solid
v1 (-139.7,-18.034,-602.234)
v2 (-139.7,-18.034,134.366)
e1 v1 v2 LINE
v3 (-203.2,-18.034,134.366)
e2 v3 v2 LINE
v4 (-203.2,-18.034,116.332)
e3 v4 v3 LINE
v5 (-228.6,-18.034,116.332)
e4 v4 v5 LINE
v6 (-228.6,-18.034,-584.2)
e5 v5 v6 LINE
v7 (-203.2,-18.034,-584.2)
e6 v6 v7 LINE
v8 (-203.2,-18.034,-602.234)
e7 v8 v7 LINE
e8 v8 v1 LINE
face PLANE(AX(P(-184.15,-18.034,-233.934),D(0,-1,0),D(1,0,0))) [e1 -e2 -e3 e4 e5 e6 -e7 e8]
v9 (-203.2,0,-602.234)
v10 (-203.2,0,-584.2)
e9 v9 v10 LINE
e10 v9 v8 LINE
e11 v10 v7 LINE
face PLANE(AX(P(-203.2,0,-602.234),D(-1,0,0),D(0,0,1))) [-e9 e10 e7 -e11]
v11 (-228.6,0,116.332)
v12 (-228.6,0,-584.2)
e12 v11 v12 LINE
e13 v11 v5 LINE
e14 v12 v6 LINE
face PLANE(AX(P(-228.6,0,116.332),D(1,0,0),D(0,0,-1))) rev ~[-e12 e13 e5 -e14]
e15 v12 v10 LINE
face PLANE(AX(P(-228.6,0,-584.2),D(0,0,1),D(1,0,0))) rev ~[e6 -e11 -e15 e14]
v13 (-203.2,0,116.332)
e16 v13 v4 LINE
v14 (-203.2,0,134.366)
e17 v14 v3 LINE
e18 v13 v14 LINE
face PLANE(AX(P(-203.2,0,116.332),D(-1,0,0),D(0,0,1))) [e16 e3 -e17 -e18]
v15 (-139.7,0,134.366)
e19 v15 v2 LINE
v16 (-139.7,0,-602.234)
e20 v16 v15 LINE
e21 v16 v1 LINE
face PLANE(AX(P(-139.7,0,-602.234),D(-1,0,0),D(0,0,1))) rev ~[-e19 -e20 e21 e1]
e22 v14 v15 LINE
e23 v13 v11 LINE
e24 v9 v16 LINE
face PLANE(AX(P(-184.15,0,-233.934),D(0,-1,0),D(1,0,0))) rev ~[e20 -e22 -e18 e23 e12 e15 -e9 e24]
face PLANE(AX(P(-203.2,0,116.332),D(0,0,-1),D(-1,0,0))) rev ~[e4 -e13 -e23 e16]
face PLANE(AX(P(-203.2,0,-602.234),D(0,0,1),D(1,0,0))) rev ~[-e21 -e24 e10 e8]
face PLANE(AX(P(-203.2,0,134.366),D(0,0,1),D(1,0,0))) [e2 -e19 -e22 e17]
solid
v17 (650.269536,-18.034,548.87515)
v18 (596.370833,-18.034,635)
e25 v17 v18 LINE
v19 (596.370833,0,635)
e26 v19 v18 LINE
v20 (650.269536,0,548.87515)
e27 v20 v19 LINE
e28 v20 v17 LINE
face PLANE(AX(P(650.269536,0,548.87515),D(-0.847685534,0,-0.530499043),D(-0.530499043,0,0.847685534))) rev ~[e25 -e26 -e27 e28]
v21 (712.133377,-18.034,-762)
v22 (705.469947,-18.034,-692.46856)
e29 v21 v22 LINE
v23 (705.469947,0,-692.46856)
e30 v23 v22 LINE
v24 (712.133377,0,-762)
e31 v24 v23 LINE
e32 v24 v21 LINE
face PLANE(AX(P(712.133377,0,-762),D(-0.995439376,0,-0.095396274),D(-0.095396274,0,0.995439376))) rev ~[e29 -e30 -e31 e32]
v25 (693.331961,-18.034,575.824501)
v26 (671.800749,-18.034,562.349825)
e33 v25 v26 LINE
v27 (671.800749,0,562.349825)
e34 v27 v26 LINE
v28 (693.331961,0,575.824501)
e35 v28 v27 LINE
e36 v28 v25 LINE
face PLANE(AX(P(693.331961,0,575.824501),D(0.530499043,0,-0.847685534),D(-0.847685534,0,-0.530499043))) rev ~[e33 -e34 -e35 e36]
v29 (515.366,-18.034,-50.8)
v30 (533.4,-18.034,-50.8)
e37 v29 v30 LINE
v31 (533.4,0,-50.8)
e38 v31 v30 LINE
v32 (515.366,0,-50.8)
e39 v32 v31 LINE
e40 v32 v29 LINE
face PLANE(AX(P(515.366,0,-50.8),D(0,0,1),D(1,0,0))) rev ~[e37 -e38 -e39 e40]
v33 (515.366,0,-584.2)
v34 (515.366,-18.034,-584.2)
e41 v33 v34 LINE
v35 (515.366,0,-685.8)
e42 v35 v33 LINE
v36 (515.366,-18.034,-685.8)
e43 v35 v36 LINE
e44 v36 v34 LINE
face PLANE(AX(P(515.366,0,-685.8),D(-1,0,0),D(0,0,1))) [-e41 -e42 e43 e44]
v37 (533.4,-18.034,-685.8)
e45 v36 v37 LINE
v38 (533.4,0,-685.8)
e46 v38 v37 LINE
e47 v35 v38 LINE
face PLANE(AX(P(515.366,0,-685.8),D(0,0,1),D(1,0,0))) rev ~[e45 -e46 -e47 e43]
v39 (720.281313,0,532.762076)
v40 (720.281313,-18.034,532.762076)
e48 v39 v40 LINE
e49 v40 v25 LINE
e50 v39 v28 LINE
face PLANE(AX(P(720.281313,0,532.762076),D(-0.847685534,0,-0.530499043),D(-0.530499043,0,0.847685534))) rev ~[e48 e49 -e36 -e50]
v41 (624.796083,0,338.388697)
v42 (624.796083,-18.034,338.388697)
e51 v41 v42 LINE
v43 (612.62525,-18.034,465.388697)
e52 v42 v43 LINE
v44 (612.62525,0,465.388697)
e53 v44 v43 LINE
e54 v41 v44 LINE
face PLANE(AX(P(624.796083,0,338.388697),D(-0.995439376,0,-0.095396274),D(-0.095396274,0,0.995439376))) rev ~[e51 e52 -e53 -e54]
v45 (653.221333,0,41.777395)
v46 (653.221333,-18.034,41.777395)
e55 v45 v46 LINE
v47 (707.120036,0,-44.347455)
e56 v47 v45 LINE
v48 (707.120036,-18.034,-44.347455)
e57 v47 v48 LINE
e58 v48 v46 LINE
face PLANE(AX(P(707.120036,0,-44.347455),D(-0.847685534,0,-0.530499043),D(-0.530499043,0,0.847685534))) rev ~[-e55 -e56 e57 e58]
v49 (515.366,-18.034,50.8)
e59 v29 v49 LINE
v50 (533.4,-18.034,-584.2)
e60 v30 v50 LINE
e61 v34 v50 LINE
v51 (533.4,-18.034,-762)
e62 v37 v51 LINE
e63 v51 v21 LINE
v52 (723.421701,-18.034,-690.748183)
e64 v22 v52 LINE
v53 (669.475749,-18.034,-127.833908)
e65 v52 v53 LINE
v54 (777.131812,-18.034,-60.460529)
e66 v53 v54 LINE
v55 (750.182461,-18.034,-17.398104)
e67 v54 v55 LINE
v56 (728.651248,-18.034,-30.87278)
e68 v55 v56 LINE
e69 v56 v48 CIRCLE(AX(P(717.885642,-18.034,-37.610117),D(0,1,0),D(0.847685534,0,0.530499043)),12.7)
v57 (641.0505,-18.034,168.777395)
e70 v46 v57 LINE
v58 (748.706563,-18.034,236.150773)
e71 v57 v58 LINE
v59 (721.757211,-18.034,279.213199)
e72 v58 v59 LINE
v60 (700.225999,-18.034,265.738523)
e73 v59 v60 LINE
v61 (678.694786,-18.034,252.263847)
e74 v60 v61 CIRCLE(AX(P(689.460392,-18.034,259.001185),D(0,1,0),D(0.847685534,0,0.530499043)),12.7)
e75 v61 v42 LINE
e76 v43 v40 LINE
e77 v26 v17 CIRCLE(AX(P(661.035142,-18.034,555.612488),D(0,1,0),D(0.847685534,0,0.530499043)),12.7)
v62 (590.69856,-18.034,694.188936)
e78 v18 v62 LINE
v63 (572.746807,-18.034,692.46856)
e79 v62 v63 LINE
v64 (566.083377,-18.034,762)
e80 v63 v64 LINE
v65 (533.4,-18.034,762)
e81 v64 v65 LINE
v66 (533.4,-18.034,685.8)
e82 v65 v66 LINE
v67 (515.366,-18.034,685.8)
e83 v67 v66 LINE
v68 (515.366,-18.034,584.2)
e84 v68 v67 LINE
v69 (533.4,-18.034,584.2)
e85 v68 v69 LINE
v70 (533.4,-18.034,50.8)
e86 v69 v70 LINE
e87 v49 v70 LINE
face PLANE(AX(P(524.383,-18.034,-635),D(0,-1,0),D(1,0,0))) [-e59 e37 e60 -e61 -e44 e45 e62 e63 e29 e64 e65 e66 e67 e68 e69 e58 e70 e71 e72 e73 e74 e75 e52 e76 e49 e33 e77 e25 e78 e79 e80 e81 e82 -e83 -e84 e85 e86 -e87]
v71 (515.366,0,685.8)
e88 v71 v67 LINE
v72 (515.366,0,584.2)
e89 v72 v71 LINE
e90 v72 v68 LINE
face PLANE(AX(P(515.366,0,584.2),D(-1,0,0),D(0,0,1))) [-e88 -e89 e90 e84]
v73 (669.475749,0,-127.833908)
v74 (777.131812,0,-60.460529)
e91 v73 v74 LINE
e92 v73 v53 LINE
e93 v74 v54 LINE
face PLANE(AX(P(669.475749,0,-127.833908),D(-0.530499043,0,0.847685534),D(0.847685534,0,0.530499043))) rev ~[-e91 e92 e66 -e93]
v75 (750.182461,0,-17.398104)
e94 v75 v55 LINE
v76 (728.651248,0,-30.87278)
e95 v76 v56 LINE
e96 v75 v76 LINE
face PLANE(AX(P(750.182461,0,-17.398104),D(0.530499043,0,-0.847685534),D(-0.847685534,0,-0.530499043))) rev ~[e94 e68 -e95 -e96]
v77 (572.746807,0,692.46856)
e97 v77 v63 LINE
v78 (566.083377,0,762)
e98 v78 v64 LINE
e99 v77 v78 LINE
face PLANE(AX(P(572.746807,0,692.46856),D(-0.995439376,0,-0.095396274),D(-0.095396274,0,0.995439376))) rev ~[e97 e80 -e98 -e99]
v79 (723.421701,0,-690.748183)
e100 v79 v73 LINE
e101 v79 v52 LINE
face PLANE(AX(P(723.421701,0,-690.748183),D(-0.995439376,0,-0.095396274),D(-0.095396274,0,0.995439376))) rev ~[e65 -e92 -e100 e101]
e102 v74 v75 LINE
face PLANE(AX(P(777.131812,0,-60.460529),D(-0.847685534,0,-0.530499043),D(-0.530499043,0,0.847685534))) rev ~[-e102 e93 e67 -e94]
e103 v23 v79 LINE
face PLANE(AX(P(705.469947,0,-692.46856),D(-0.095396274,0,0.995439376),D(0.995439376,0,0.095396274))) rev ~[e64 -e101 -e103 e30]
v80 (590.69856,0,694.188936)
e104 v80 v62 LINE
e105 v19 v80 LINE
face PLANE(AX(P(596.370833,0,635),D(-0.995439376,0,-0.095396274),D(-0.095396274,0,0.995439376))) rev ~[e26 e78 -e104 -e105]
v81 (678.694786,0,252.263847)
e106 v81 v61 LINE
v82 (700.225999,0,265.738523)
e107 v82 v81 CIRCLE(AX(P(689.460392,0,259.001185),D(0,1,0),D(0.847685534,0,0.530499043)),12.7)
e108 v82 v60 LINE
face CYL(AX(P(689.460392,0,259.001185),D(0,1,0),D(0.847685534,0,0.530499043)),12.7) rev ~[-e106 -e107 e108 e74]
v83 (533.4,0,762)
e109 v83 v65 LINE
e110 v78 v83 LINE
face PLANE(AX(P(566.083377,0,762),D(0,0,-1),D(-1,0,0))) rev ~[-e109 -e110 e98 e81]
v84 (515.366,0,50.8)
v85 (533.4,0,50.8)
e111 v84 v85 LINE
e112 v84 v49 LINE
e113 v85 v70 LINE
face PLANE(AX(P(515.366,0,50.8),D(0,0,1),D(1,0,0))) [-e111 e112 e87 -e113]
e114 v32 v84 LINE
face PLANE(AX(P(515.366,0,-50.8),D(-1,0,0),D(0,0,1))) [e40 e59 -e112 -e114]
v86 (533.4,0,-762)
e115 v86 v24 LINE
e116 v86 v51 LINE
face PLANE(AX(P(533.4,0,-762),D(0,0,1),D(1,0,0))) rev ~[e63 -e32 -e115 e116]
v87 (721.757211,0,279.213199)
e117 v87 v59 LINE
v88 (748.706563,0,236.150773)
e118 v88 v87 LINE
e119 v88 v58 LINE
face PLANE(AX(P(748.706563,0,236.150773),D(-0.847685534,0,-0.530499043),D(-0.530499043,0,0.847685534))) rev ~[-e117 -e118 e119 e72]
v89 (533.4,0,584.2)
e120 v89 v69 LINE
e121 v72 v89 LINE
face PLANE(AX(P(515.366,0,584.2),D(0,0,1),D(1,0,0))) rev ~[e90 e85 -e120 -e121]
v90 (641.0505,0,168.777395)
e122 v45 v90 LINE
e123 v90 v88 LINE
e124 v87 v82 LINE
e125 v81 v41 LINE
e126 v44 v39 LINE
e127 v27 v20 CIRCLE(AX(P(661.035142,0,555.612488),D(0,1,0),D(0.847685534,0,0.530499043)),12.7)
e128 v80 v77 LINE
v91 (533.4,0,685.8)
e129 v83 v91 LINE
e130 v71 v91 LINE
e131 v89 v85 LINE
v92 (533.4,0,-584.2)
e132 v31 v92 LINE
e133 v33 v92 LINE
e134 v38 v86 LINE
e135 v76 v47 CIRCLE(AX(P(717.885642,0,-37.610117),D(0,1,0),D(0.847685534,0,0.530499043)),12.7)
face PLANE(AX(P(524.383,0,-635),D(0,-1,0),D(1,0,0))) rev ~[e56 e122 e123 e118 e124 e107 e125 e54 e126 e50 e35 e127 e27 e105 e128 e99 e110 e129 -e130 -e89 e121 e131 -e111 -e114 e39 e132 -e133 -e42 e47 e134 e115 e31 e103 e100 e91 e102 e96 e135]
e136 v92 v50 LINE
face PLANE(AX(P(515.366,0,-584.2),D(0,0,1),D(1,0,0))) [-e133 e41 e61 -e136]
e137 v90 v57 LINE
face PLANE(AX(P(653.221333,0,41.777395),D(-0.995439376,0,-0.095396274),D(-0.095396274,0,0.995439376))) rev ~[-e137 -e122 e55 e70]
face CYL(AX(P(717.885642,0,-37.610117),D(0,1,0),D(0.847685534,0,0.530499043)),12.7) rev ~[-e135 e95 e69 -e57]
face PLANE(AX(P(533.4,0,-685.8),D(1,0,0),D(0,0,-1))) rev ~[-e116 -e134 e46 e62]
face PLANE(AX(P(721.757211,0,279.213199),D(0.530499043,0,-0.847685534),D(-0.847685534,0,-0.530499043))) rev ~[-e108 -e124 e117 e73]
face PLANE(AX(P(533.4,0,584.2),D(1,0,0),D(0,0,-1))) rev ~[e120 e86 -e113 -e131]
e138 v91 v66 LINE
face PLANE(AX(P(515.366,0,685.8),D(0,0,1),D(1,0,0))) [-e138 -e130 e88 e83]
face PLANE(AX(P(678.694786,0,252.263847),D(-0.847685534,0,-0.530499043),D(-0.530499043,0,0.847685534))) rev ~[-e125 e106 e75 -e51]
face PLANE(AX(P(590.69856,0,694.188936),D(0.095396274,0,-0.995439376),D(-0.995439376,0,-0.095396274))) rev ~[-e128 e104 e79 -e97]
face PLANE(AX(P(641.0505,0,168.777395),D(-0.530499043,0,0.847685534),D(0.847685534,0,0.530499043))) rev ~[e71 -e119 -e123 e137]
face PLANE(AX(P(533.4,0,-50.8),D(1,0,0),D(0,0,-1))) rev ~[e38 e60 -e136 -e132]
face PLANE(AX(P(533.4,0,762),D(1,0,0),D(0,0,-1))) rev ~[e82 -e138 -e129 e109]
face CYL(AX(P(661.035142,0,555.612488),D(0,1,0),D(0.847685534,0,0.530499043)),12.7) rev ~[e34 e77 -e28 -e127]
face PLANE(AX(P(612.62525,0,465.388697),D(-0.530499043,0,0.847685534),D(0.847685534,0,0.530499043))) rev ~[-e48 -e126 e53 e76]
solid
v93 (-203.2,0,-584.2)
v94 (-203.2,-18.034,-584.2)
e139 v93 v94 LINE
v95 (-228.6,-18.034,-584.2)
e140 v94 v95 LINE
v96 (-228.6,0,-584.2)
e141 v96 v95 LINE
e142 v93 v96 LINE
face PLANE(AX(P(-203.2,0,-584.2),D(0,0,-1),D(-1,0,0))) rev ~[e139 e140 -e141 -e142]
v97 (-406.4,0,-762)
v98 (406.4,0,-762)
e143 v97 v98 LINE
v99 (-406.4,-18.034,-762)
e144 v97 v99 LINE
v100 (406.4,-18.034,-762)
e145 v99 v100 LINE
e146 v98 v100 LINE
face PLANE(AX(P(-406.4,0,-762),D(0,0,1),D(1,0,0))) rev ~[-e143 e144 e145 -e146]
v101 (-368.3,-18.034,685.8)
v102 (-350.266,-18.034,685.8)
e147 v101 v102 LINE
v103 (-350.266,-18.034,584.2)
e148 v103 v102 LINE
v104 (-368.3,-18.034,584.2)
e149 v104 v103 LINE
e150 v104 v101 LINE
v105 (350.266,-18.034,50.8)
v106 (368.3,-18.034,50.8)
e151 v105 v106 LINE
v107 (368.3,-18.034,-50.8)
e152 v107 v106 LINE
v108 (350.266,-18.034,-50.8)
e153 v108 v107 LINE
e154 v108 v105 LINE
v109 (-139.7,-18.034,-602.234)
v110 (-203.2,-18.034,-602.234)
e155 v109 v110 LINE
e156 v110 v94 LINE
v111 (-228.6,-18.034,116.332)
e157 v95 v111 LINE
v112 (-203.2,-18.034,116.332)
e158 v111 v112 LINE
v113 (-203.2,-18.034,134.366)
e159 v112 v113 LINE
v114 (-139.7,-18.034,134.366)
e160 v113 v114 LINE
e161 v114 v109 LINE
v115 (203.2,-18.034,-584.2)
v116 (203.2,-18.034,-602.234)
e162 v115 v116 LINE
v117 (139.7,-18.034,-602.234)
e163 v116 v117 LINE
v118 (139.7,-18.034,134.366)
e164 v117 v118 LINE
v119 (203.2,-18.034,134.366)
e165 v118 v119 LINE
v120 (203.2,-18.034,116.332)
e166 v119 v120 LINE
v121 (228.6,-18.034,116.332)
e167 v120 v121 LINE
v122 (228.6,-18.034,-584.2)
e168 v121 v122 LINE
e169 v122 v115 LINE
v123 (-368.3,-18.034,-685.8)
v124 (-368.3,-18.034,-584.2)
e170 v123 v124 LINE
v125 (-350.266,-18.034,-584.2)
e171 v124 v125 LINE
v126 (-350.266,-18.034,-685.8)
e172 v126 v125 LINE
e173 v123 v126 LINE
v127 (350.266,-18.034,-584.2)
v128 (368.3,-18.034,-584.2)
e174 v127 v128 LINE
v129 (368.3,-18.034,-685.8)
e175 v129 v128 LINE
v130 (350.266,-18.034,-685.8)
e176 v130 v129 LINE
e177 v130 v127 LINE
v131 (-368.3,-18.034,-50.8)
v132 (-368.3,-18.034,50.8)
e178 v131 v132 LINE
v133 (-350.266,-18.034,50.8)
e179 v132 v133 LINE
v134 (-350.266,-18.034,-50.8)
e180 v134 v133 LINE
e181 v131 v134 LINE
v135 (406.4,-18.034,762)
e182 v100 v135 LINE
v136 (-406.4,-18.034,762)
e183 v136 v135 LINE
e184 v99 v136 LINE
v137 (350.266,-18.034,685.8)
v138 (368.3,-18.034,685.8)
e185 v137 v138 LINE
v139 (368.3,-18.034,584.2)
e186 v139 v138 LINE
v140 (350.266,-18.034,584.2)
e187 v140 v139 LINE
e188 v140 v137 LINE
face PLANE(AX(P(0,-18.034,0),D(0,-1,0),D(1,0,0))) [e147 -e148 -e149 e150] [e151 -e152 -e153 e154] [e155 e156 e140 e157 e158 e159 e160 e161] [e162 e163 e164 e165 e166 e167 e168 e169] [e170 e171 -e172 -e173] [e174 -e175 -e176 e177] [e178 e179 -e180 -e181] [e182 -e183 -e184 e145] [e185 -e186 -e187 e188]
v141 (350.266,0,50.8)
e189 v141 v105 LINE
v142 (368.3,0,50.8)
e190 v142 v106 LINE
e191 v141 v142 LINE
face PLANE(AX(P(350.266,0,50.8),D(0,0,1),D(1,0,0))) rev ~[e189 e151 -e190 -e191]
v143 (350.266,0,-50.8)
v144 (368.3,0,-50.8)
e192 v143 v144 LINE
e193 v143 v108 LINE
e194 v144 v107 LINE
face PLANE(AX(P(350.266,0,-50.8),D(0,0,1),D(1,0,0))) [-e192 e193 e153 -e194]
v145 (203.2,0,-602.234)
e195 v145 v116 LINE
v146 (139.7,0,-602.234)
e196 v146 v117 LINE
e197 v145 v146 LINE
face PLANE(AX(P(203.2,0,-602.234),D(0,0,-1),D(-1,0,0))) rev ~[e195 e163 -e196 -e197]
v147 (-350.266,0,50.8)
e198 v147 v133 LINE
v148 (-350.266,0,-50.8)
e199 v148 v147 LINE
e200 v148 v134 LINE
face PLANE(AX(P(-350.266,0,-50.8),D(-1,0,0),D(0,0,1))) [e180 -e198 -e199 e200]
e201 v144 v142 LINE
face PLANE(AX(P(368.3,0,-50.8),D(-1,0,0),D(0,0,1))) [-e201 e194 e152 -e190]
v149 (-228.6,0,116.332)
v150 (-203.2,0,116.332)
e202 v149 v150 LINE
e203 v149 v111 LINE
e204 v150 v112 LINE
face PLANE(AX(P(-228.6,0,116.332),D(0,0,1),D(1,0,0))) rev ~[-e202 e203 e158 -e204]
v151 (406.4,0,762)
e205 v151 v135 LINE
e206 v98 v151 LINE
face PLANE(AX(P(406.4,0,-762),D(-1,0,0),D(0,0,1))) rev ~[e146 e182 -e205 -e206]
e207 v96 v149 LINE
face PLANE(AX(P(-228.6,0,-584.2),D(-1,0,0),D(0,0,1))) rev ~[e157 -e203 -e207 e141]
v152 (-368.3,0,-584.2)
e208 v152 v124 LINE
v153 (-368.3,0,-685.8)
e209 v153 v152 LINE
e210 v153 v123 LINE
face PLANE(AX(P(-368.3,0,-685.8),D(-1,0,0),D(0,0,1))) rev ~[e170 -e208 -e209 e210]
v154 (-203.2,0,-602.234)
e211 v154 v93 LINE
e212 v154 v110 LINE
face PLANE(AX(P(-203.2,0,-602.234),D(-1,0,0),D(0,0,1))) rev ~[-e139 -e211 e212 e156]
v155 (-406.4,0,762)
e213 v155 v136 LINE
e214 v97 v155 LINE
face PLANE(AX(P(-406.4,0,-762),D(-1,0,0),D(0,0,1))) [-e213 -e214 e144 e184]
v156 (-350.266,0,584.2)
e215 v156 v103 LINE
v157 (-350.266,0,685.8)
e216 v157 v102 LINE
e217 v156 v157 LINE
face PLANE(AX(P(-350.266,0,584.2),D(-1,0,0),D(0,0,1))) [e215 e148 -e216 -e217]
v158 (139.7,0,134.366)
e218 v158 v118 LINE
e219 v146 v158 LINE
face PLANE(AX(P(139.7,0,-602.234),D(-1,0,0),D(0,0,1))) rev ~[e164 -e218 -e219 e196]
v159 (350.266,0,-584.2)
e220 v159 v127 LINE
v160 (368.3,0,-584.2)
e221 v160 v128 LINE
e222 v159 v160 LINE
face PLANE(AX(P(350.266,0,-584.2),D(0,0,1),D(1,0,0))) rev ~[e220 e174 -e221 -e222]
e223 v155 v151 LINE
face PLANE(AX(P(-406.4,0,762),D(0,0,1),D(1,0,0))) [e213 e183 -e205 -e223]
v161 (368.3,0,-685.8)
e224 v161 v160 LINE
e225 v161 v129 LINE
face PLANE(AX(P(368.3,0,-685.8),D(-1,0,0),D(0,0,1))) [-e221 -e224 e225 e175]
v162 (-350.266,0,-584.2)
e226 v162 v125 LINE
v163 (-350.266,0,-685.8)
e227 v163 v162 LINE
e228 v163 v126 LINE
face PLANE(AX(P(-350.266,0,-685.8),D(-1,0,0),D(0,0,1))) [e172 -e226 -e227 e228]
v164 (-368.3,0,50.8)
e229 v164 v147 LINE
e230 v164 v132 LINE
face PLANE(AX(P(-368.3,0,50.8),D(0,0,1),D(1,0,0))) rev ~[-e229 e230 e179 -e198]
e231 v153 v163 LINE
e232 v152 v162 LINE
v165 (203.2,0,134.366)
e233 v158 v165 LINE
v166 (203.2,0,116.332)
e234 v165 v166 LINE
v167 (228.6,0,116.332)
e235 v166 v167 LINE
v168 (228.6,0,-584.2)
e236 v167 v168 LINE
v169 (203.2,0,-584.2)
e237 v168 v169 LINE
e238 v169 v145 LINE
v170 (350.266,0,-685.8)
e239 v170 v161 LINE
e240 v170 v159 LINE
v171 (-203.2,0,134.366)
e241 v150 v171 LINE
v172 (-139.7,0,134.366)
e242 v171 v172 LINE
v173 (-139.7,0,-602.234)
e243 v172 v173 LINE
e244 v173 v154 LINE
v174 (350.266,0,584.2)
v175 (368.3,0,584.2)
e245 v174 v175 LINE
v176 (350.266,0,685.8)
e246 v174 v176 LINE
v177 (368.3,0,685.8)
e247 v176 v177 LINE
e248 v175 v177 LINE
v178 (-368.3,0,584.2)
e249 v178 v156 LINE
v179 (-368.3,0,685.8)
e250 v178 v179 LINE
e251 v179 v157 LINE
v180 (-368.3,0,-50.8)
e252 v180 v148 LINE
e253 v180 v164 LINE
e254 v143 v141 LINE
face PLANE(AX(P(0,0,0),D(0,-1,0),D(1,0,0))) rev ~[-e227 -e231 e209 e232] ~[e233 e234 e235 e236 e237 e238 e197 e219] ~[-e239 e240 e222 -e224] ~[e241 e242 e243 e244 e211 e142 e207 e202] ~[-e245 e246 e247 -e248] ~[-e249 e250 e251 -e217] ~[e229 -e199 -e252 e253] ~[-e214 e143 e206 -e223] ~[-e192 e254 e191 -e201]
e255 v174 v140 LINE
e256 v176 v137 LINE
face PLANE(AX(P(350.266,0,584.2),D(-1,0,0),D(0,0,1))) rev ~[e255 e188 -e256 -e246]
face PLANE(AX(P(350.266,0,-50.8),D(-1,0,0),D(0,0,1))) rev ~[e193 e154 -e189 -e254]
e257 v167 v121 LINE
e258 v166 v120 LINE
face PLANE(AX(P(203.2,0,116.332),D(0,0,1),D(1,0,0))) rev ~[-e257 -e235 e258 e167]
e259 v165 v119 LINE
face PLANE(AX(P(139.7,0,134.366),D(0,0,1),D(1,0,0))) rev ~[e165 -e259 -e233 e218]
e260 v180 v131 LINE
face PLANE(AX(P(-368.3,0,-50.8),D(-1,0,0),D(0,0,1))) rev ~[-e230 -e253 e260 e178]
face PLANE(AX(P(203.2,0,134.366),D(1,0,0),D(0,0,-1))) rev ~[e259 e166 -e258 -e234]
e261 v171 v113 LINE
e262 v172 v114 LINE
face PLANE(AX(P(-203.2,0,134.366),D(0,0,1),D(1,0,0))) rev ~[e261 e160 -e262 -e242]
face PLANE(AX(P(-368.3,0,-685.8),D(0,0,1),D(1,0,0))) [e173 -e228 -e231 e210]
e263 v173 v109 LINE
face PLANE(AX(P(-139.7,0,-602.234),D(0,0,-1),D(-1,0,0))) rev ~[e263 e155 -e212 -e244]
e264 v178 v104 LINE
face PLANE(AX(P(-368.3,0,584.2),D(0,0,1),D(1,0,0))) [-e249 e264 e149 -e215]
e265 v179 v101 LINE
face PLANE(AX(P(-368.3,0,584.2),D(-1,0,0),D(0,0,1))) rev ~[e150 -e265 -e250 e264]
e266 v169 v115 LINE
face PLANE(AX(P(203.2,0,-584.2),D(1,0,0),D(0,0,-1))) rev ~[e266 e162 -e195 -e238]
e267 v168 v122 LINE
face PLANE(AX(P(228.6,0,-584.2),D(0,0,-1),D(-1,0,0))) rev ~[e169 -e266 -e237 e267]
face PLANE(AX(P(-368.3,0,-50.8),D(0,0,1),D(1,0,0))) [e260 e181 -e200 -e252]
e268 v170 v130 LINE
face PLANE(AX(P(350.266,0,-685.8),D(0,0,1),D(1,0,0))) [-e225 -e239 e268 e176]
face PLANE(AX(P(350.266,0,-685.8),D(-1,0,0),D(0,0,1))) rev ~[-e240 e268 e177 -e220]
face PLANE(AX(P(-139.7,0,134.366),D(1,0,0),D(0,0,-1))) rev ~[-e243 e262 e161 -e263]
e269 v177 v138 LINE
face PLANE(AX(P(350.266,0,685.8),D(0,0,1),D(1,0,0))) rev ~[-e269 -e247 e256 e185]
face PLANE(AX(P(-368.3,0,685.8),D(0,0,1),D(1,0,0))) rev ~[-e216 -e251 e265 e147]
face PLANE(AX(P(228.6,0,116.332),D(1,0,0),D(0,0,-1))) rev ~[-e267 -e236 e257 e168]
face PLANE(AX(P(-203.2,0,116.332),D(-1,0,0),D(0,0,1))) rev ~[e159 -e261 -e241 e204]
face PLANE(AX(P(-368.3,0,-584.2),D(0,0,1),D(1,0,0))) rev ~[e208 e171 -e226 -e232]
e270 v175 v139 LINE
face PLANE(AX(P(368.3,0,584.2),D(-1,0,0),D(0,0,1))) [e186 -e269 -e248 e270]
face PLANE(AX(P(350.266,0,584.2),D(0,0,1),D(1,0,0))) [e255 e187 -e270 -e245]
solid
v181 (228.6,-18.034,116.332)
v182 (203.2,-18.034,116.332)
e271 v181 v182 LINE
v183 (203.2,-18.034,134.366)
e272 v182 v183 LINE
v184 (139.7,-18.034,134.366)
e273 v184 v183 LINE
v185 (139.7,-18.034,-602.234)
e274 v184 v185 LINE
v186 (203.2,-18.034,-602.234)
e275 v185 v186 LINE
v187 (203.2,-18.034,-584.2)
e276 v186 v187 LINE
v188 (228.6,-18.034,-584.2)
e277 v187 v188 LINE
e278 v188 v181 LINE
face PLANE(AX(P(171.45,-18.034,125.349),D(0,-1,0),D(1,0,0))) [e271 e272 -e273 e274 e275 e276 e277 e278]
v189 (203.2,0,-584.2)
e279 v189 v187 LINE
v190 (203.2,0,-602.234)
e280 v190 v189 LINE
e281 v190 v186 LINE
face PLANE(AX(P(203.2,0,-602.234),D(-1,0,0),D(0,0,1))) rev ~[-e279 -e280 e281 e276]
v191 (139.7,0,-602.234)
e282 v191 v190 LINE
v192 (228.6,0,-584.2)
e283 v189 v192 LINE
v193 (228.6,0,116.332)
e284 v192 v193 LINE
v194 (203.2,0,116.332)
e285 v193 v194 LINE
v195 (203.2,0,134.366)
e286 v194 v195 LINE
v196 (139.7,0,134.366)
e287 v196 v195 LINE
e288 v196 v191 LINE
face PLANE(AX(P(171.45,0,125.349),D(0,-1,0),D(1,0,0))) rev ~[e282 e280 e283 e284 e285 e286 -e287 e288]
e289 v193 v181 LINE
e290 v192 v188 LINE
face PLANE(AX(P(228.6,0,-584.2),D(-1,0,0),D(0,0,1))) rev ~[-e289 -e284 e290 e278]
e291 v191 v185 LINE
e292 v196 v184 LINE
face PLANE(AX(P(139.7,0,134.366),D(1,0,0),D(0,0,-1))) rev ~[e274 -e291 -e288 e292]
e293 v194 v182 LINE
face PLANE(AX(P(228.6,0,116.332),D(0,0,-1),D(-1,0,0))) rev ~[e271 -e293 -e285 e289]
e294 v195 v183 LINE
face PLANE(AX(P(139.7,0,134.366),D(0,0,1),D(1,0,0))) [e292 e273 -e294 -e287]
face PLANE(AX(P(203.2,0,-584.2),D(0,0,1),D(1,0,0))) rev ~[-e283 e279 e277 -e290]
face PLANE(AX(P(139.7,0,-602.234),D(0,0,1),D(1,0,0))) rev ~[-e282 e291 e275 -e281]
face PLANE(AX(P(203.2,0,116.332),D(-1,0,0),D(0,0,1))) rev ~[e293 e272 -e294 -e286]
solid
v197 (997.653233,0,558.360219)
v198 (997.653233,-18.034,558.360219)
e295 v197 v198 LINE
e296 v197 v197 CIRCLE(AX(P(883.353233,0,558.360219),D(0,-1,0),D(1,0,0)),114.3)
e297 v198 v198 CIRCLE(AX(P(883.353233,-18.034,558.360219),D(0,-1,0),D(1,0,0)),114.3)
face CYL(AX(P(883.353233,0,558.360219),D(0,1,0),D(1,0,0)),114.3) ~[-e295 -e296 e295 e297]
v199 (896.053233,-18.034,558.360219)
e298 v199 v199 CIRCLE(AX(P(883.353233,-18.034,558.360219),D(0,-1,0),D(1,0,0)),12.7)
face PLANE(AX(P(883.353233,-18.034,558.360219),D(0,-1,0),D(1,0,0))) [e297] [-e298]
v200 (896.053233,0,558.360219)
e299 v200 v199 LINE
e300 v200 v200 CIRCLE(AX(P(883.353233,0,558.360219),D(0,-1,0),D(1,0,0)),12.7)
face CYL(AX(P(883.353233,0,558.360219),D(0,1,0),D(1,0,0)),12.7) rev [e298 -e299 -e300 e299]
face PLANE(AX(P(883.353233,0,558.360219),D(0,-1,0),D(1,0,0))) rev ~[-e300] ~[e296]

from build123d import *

# Parameters (mm, degrees)
F1_W     = 812.8
F1_H     = 1524
F1_W_2   = 18.034
F1_H_2   = 101.6
F2_DEPTH = 18.034
F1_R     = 114.3
F1_R_2   = 12.7
F1_W_3   = 63.5
F1_H_3   = 18.034
F3_DEPTH = 18.034


# Not quite as in the source:
# - a variable given as a bare number and used for a length is read in inches; the dataset says mm whatever the document's units were


with BuildPart() as f2:
    # F1 (on Front) → F2 (new body)
    with BuildSketch(Plane.XZ):
        Rectangle(F1_W, F1_H)
        with Locations((-359.283, -635)):
            Rectangle(F1_W_2, F1_H_2, mode=Mode.SUBTRACT)
        Polygon((-203.2, -584.2), (-228.6, -584.2), (-228.6, 116.332), (-203.2, 116.332), (-203.2, 134.366), (-139.7, 134.366), (-139.7, 116.332), (-139.7, -584.2), (-139.7, -602.234), (-203.2, -602.234), align=None, mode=Mode.SUBTRACT)
        Polygon((139.7, -602.234), (139.7, -584.2), (139.7, 116.332), (139.7, 134.366), (203.2, 134.366), (203.2, 116.332), (228.6, 116.332), (228.6, -584.2), (203.2, -584.2), (203.2, -602.234), align=None, mode=Mode.SUBTRACT)
        with Locations((359.283, -635)):
            Rectangle(F1_W_2, F1_H_2, mode=Mode.SUBTRACT)
        with Locations((-359.283, 0)):
            Rectangle(F1_W_2, F1_H_2, mode=Mode.SUBTRACT)
        with Locations((-359.283, 635)):
            Rectangle(F1_W_2, F1_H_2, mode=Mode.SUBTRACT)
        with Locations((359.283, 0)):
            Rectangle(F1_W_2, F1_H_2, mode=Mode.SUBTRACT)
        with Locations((359.283, 635)):
            Rectangle(F1_W_2, F1_H_2, mode=Mode.SUBTRACT)
    extrude(amount=F2_DEPTH)


with BuildPart() as f2b:
    # F1 (on Front) → F2, piece 2 (new body)
    with BuildSketch(Plane.XZ):
        with Locations((524.383, -635)):
            Rectangle(F1_W_2, F1_H_2)
        with Locations((524.383, 0)):
            Rectangle(F1_W_2, F1_H_2)
        with Locations((524.383, 635)):
            Rectangle(F1_W_2, F1_H_2)
        Polygon((650.269536136, 548.8751497174), (596.3708333333, 635), (607.2071109947, 521.9257983161), align=None)
        with BuildLine():
            Line((650.269536136, 548.8751497174), (607.2071109947, 521.9257983161))
            Line((607.2071109947, 521.9257983161), (612.6252498254, 465.3886974742))
            Line((612.6252498254, 465.3886974742), (720.2813126786, 532.7620759775))
            Line((720.2813126786, 532.7620759775), (693.3319612773, 575.8245011188))
            Line((693.3319612773, 575.8245011188), (671.8007487066, 562.3498254181))
            ThreePointArc((671.8007487066, 562.3498254181), (667.7724802716, 544.8468812825), (650.269536136, 548.8751497174))
        make_face()
        Polygon((678.6947859614, 252.2638471916), (624.7960831587, 338.3886974742), (635.6323608201, 225.3144957903), align=None)
        with BuildLine():
            Line((678.6947859614, 252.2638471916), (635.6323608201, 225.3144957903))
            Line((635.6323608201, 225.3144957903), (641.0504996508, 168.7773949484))
            Line((641.0504996508, 168.7773949484), (748.706562504, 236.1507734517))
            Line((748.706562504, 236.1507734517), (721.7572111026, 279.213198593))
            Line((721.7572111026, 279.213198593), (700.225998532, 265.7385228923))
            ThreePointArc((700.225998532, 265.7385228923), (696.197730097, 248.2355787566), (678.6947859614, 252.2638471916))
        make_face()
        Polygon((707.1200357868, -44.3474553342), (653.2213329841, 41.7773949484), (664.0576106455, -71.2968067355), align=None)
        with BuildLine():
            Line((664.0576106455, -71.2968067355), (669.4757494762, -127.8339075774))
            Line((669.4757494762, -127.8339075774), (777.1318123294, -60.4605290741))
            Line((777.1318123294, -60.4605290741), (750.182460928, -17.3981039329))
            Line((750.182460928, -17.3981039329), (728.6512483574, -30.8727796335))
            ThreePointArc((728.6512483574, -30.8727796335), (724.6229799224, -48.3757237692), (707.1200357868, -44.3474553342))
            Line((707.1200357868, -44.3474553342), (664.0576106455, -71.2968067355))
        make_face()
        Polygon((566.0833768912, 762), (533.4, 762), (533.4, 685.8), (533.4, 584.2), (533.4, 50.8), (533.4, -50.8), (533.4, -584.2), (533.4, -685.8), (533.4, -762), (712.1333768912, -762), (705.4699471859, -692.4685595967), (723.42170089, -690.7481832), (669.4757494762, -127.8339075774), (664.0576106455, -71.2968067355), (653.2213329841, 41.7773949484), (641.0504996508, 168.7773949484), (635.6323608201, 225.3144957903), (624.7960831587, 338.3886974742), (612.6252498254, 465.3886974742), (607.2071109947, 521.9257983161), (596.3708333333, 635), (590.6985603006, 694.1889359933), (572.7468065965, 692.4685595967), align=None)
    extrude(amount=F2_DEPTH)


with BuildPart() as f2c:
    # F1 (on Front) → F2, piece 3 (new body)
    with BuildSketch(Plane.XZ):
        with Locations((883.3532333374, 558.3602190018)):
            Circle(F1_R)
        with Locations((883.3532333374, 558.3602190018)):
            Circle(F1_R_2, mode=Mode.SUBTRACT)
    extrude(amount=F2_DEPTH)


with BuildPart() as f3:
    # F1 (on Front) → F3 (new body)
    with BuildSketch(Plane.XZ):
        Polygon((-228.6, 116.332), (-228.6, -584.2), (-203.2, -584.2), (-139.7, -584.2), (-139.7, 116.332), (-203.2, 116.332), align=None)
        with Locations((-171.45, 125.349)):
            Rectangle(F1_W_3, F1_H_3)
        with Locations((-171.45, -593.217)):
            Rectangle(F1_W_3, F1_H_3)
    extrude(amount=F3_DEPTH)


with BuildPart() as f3b:
    # F1 (on Front) → F3, piece 2 (new body)
    with BuildSketch(Plane.XZ):
        with Locations((171.45, 125.349)):
            Rectangle(F1_W_3, F1_H_3)
        Polygon((139.7, 116.332), (139.7, -584.2), (203.2, -584.2), (228.6, -584.2), (228.6, 116.332), (203.2, 116.332), align=None)
        with Locations((171.45, -593.217)):
            Rectangle(F1_W_3, F1_H_3)
    extrude(amount=F3_DEPTH)


solid = Compound([f2.part, f2b.part, f2c.part, f3.part, f3b.part])
